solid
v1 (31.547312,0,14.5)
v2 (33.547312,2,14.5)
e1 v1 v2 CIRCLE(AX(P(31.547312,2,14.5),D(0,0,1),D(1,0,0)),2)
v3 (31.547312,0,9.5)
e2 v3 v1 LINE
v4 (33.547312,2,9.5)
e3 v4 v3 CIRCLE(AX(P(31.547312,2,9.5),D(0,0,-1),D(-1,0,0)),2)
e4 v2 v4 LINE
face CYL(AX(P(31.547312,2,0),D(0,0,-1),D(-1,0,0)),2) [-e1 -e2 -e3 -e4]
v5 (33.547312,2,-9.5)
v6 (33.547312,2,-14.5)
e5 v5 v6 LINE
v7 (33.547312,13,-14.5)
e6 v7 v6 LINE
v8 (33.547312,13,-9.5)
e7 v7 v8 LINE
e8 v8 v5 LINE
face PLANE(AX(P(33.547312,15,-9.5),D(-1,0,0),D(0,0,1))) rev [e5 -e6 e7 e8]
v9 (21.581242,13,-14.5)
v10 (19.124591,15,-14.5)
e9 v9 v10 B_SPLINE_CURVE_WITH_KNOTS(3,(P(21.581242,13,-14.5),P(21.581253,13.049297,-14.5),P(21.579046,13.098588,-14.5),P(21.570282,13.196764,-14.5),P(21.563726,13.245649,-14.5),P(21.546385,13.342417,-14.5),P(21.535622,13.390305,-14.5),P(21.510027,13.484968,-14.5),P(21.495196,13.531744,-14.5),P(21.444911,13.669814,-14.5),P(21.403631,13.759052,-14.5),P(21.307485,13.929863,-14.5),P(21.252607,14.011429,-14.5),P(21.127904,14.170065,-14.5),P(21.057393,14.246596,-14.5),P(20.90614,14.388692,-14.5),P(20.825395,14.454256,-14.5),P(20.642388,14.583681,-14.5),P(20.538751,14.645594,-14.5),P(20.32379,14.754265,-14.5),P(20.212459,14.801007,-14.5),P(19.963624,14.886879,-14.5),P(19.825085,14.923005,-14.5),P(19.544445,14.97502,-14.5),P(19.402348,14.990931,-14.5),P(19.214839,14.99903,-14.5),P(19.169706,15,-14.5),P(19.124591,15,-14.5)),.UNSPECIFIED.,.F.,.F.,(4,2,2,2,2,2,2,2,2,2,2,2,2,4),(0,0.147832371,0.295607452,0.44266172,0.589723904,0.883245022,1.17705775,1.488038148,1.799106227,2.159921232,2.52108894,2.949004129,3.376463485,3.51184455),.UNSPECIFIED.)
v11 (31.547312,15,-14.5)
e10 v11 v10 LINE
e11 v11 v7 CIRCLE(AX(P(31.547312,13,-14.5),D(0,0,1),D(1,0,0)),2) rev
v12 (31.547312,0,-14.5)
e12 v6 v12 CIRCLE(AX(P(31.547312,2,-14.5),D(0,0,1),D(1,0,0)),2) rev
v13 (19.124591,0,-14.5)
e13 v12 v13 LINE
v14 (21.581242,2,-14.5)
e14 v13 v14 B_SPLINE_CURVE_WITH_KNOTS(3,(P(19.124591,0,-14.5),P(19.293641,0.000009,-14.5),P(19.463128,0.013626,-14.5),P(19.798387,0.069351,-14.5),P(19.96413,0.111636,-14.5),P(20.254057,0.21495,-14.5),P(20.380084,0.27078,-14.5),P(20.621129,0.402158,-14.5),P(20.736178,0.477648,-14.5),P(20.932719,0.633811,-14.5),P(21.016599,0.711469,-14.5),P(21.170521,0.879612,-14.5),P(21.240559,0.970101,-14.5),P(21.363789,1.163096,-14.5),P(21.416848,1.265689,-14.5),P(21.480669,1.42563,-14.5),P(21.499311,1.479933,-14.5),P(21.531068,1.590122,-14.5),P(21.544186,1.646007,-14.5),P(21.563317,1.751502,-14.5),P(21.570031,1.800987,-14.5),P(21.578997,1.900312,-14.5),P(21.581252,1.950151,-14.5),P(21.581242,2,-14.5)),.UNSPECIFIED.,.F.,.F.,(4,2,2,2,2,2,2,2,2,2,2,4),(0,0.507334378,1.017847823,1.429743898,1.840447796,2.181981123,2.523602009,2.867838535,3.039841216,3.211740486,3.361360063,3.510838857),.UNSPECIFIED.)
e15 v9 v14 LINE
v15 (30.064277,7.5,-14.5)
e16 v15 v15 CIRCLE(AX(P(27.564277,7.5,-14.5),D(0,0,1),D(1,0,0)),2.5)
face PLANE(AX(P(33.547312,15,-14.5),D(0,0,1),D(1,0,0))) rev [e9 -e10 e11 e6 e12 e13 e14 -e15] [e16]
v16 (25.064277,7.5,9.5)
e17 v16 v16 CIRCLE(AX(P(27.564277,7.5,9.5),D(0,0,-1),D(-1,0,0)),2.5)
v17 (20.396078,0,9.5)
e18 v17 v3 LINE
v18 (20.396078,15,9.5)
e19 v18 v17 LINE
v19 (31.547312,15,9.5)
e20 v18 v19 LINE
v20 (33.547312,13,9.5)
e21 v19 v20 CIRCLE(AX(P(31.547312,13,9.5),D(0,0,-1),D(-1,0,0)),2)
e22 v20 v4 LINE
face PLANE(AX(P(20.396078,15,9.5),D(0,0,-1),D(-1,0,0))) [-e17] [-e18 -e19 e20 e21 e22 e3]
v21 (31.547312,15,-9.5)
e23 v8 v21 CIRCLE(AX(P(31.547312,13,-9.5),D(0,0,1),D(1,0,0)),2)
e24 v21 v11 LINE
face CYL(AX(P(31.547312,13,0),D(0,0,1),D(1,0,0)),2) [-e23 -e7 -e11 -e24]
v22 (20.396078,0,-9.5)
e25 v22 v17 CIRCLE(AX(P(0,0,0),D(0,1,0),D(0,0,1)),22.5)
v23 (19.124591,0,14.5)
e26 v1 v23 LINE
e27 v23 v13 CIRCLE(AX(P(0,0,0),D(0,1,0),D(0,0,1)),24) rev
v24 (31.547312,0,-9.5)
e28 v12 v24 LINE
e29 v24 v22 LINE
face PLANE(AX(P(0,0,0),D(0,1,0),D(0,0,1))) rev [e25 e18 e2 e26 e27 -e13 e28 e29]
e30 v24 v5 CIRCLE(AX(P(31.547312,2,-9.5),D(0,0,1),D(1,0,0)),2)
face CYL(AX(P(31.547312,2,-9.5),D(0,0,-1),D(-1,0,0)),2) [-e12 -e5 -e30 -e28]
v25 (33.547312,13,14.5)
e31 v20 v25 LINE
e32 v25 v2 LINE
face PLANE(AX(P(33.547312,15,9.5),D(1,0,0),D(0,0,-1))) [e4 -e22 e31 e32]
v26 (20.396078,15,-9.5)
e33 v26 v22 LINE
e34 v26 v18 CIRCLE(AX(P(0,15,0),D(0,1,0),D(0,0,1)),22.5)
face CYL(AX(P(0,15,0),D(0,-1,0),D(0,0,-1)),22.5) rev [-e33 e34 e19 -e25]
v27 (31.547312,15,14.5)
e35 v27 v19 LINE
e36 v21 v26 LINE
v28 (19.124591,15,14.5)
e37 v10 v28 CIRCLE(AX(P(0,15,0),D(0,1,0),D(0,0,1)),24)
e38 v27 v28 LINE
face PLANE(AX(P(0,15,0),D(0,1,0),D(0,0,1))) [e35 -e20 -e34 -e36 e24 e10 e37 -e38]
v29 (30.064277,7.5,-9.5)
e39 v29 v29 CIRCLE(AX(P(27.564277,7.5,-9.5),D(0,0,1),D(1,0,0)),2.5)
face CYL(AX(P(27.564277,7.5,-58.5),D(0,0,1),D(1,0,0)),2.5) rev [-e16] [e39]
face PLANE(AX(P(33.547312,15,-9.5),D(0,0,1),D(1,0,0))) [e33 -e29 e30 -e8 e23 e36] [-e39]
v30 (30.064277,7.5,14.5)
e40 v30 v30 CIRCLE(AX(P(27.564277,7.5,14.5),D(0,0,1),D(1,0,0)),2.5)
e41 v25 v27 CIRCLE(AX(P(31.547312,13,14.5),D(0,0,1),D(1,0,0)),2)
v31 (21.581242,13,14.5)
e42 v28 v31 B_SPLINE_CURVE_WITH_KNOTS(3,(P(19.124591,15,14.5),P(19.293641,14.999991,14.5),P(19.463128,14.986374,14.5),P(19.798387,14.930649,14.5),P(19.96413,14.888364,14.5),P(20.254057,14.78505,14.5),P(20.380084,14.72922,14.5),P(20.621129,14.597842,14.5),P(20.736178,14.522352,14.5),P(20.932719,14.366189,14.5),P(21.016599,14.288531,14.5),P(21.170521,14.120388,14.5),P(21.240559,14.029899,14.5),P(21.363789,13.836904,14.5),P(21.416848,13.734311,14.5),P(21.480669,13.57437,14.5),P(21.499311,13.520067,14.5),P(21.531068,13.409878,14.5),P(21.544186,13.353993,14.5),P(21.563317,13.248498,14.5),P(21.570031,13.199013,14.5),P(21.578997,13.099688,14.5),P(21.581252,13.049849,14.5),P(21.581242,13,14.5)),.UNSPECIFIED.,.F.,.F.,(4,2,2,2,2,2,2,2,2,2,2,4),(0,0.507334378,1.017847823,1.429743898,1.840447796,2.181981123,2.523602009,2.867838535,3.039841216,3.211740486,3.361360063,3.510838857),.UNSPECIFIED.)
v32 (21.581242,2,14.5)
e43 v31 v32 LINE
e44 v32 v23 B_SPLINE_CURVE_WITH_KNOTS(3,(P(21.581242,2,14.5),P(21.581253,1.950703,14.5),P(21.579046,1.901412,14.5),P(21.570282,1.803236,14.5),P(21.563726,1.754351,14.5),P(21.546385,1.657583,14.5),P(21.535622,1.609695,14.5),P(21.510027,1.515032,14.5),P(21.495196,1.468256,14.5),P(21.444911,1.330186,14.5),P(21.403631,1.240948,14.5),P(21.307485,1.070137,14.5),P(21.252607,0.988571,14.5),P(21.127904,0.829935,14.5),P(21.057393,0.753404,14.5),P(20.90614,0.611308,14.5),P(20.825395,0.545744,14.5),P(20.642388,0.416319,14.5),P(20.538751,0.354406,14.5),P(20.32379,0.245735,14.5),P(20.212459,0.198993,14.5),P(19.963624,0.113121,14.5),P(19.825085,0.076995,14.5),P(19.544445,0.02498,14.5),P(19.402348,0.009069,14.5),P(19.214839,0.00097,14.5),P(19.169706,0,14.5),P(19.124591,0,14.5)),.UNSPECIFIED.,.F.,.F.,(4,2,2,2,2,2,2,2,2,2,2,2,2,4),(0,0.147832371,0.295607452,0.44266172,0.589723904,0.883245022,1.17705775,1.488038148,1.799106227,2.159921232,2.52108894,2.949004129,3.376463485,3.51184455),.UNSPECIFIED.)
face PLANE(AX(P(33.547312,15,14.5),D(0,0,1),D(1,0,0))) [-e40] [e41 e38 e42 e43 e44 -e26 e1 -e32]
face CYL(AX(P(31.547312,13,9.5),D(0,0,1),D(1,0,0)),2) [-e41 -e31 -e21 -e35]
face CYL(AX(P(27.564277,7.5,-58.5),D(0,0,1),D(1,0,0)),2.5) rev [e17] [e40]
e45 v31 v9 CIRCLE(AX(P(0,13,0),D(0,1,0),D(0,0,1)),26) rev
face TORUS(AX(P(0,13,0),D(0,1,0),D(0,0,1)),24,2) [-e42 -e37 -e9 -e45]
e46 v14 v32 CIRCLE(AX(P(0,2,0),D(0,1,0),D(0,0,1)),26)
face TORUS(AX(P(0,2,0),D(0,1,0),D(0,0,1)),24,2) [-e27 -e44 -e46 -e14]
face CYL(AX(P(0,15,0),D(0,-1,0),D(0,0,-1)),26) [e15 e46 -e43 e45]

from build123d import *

# Parameters (mm, degrees)
SALIENTE_EXTRUIR1_DEPTH = 15
REDONDEO1_R             = 2
CROQUIS2_R              = 2.5
CORTAR_EXTRUIR1_DEPTH   = 73


# Read off the part's stored shape, not the designer's step: Saliente-Extruir1
with BuildPart() as part:
    # Saliente-Extruir1 outline → Saliente-Extruir1 (new body)
    with BuildSketch(Plane(origin=(0, 0, 0), x_dir=(1, 0, 0), z_dir=(0, 1, 0))):
        with BuildLine():
            Line((33.547312235, 9.5), (33.547312235, 14.5))
            Line((33.547312235, 14.5), (21.581241855, 14.5))
            ThreePointArc((21.581241855, 14.5), (-26, 0), (21.581241855, -14.5))
            Line((21.581241855, -14.5), (33.547312235, -14.5))
            Line((33.547312235, -14.5), (33.547312235, -9.5))
            Line((33.547312235, -9.5), (20.396078054, -9.5))
            ThreePointArc((20.396078054, -9.5), (-22.5, 0), (20.396078054, 9.5))
            Line((20.396078054, 9.5), (33.547312235, 9.5))
        make_face()
    extrude(amount=SALIENTE_EXTRUIR1_DEPTH)

    # Redondeo1
    redondeo1_edges = [part.edges().sort_by_distance(p)[0] for p in [
        (-26, 0, 0),
        (33.547312235, 0, -12),
        (-26, 15, 0),
        (33.547312235, 15, 12),
        (33.547312235, 15, -12),
        (33.547312235, 0, 12),
    ]]
    fillet(redondeo1_edges, radius=REDONDEO1_R)

    # Croquis2 → Cortar-Extruir1 (cut)
    with BuildSketch(Plane.XY.offset(14.5)):
        with Locations((27.564277045, 7.5)):
            Circle(CROQUIS2_R)
    extrude(amount=-CORTAR_EXTRUIR1_DEPTH, mode=Mode.SUBTRACT)


solid = part.part
